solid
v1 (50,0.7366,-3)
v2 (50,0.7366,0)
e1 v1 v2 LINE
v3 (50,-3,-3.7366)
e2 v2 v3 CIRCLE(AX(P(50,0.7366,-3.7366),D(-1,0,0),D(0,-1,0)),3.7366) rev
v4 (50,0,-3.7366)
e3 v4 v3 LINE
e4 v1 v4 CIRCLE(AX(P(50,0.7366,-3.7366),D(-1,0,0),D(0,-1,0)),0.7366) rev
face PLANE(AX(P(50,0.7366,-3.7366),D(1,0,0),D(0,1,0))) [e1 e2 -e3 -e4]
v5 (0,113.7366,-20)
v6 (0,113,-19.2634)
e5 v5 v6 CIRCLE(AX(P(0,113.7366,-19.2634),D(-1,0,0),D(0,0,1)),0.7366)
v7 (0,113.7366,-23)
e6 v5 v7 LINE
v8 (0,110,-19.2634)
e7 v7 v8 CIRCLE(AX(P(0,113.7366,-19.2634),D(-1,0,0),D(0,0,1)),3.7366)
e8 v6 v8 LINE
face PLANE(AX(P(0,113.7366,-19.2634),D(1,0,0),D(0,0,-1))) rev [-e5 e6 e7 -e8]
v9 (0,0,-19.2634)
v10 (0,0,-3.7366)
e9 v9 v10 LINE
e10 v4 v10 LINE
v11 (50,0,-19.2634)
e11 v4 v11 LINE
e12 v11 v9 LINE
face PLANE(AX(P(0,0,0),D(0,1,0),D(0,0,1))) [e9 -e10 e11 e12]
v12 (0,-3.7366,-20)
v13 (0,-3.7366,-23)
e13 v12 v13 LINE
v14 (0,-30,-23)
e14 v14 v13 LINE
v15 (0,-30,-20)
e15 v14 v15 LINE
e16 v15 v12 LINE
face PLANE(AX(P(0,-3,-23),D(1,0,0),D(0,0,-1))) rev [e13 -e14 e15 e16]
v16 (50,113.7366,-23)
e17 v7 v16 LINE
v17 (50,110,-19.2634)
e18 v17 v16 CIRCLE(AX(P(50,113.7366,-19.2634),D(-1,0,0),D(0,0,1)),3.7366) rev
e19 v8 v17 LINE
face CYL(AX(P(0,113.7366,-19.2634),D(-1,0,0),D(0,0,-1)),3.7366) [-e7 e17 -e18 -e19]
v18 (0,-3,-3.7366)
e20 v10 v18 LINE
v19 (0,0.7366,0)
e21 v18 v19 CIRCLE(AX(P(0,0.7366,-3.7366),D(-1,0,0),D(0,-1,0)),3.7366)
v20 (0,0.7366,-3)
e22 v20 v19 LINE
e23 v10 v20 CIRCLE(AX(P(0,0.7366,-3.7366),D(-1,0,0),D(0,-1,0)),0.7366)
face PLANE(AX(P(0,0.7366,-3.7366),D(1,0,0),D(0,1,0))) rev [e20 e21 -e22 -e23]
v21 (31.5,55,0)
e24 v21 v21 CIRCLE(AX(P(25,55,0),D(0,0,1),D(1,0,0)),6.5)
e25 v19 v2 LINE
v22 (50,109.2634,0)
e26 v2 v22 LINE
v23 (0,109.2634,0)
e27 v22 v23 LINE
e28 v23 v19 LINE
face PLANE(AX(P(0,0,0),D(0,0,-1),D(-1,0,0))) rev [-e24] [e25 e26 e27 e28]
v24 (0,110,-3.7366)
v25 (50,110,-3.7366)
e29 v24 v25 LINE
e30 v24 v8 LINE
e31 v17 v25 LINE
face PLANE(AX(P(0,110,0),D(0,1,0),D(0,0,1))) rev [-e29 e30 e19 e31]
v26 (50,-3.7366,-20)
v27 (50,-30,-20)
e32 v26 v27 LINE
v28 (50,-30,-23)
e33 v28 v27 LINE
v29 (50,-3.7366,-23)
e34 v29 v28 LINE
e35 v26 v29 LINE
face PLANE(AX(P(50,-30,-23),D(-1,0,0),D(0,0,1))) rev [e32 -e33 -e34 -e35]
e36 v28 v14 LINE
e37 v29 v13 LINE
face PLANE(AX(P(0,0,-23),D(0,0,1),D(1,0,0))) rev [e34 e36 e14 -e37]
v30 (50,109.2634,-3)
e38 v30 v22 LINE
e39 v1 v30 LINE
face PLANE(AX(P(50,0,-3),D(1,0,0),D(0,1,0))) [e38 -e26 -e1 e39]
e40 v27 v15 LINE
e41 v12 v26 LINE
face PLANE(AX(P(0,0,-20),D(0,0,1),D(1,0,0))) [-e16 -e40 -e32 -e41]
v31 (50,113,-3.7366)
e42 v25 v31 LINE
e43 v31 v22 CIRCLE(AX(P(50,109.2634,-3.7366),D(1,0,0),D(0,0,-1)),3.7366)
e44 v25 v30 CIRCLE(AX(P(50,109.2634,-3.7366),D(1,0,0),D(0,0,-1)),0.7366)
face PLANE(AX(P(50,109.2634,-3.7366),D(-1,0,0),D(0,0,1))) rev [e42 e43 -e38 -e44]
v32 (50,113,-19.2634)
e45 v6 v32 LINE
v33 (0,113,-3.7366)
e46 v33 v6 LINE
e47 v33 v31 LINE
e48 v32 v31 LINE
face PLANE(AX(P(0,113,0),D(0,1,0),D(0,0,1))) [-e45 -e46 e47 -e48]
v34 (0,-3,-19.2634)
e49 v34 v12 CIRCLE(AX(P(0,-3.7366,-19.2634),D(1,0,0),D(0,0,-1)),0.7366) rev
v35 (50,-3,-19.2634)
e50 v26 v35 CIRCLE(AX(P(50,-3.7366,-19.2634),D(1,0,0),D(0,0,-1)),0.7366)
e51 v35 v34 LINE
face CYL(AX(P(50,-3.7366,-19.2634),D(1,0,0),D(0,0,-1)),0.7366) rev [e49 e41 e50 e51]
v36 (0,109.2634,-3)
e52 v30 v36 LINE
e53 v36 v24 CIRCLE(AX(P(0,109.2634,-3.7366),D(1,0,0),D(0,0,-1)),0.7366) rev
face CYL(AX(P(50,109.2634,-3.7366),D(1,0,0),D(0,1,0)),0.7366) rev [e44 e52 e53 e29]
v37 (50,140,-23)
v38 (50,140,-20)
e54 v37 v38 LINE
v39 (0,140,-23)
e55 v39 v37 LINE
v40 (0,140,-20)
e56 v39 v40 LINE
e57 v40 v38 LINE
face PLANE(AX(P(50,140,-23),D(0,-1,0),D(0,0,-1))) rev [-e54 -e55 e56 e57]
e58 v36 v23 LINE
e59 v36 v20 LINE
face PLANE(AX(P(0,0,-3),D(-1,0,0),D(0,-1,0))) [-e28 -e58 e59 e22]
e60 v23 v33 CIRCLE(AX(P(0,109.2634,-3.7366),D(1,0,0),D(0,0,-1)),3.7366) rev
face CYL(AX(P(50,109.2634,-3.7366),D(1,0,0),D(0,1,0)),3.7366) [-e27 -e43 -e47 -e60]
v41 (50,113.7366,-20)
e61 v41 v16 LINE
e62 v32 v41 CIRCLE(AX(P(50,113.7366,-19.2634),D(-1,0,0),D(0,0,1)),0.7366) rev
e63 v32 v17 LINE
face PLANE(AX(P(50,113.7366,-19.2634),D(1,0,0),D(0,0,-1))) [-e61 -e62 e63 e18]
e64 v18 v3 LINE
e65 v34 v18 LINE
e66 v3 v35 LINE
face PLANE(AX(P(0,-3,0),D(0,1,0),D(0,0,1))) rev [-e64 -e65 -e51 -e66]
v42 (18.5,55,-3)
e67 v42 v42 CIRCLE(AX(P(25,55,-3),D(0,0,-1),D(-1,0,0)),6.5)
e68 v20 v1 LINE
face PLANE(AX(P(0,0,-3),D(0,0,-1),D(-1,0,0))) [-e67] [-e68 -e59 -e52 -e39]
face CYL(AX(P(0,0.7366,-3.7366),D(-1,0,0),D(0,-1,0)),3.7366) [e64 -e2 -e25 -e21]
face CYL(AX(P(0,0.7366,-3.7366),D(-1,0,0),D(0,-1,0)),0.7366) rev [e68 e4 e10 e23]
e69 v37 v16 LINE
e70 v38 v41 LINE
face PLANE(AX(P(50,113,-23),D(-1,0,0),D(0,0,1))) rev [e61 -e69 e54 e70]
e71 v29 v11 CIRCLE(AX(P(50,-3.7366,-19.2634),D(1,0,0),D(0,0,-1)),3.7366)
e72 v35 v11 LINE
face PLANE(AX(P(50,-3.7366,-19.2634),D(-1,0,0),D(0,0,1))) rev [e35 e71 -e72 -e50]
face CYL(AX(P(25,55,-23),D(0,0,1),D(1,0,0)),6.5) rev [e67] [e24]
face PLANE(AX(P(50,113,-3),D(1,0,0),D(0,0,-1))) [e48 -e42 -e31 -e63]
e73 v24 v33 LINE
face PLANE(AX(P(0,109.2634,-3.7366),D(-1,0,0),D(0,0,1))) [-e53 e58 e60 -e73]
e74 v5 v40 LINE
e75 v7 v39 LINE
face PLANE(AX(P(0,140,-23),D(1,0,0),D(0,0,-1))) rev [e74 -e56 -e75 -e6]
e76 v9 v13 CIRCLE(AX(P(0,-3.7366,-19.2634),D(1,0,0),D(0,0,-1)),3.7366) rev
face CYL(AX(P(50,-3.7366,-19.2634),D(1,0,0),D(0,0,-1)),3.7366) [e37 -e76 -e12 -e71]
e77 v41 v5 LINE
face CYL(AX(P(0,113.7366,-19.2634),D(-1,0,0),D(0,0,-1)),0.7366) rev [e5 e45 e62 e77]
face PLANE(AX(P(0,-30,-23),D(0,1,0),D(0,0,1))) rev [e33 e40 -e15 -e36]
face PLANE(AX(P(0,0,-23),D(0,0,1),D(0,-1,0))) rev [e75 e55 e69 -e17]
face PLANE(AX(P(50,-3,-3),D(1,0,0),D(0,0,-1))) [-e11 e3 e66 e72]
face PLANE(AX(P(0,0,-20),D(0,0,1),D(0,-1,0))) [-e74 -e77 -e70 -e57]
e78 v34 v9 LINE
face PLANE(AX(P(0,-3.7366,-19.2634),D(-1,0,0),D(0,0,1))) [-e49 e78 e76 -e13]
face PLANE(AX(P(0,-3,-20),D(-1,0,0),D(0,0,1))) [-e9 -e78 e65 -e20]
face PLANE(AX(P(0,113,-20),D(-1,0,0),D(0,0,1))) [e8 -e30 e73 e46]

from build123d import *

# Parameters (mm, degrees)
SKETCH_1_W                         = 50
SKETCH_1_H                         = 110
SM_BASE_FLANGE_1_DEPTH             = 3
SM_EDGE_FLANGE_1_STRIP_W           = 13.4732
SM_EDGE_FLANGE_1_STRIP_H           = 3
SM_EDGE_FLANGE_1_STRIP_CUT_DEPTH   = 50
SM_EDGE_FLANGE_1_STRIP_2_W         = 13.4732
SM_EDGE_FLANGE_1_STRIP_2_H         = 3
SM_EDGE_FLANGE_1_STRIP_CUT_2_DEPTH = 50
SM_EDGE_FLANGE_1_DEPTH             = 50
SM_EDGE_FLANGE_1_BEND_DEPTH        = 50
SM_EDGE_FLANGE_2_STRIP_W           = 13.4732
SM_EDGE_FLANGE_2_STRIP_H           = 3
SM_EDGE_FLANGE_2_STRIP_CUT_DEPTH   = 50
SM_EDGE_FLANGE_2_STRIP_2_W         = 13.4732
SM_EDGE_FLANGE_2_STRIP_2_H         = 3
SM_EDGE_FLANGE_2_STRIP_CUT_2_DEPTH = 50
SM_EDGE_FLANGE_2_DEPTH             = 50
SM_EDGE_FLANGE_2_BEND_DEPTH        = 50
SKETCH_18_R                        = 6.5
CUT_EXTRUDE_1_DEPTH                = 151.429385427


# Sheet-metal steps are written as plain solids
with BuildPart() as part:
    # Sketch 1 → 基体-法兰1 (new body)
    with BuildSketch(Plane.XY):
        with Locations((25, 55)):
            Rectangle(SKETCH_1_W, SKETCH_1_H)
    extrude(amount=-SM_BASE_FLANGE_1_DEPTH)

    # 边线-法兰1 strip (across the edge) → 边线-法兰1 strip cut (cut)
    with BuildSketch(Plane(origin=(0, 110, -3), x_dir=(0, -1, 0), z_dir=(1, 0, 0))):
        with Locations((-6, -1.5)):
            Rectangle(SM_EDGE_FLANGE_1_STRIP_W, SM_EDGE_FLANGE_1_STRIP_H)
    extrude(amount=SM_EDGE_FLANGE_1_STRIP_CUT_DEPTH, mode=Mode.SUBTRACT)

    # 边线-法兰1 strip 2 (across the edge) → 边线-法兰1 strip cut 2 (cut)
    with BuildSketch(Plane(origin=(50, 0, -3), x_dir=(0, 1, 0), z_dir=(-1, 0, 0))):
        with Locations((-6, -1.5)):
            Rectangle(SM_EDGE_FLANGE_1_STRIP_2_W, SM_EDGE_FLANGE_1_STRIP_2_H)
    extrude(amount=SM_EDGE_FLANGE_1_STRIP_CUT_2_DEPTH, mode=Mode.SUBTRACT)

    # 边线-法兰1 section (across the edge) → 边线-法兰1 (add)
    with BuildSketch(Plane(origin=(0, 110, -3), x_dir=(0, -1, 0), z_dir=(1, 0, 0))):
        with BuildLine():
            Line((-3, 0.7366), (-3, 17))
            Line((-3, 17), (0, 17))
            Line((0, 17), (0, 0.7366))
            ThreePointArc((0, 0.7366), (0.215745145, 0.215745145), (0.7366, 0))
            Line((0.7366, 0), (0.7366, -3))
            ThreePointArc((0.7366, -3), (-1.905575199, -1.905575199), (-3, 0.7366))
        make_face()
    extrude(amount=SM_EDGE_FLANGE_1_DEPTH)

    # 边线-法兰1 section 2 (across the edge) → 边线-法兰1 bend (add)
    with BuildSketch(Plane(origin=(50, 0, -3), x_dir=(0, 1, 0), z_dir=(-1, 0, 0))):
        with BuildLine():
            Line((-3, 0.7366), (-3, 17))
            Line((-3, 17), (0, 17))
            Line((0, 17), (0, 0.7366))
            ThreePointArc((0, 0.7366), (0.215745145, 0.215745145), (0.7366, 0))
            Line((0.7366, 0), (0.7366, -3))
            ThreePointArc((0.7366, -3), (-1.905575199, -1.905575199), (-3, 0.7366))
        make_face()
    extrude(amount=SM_EDGE_FLANGE_1_BEND_DEPTH)

    # 边线-法兰2 strip (across the edge) → 边线-法兰2 strip cut (cut)
    with BuildSketch(Plane(origin=(0, -3, -20), x_dir=(0, 0, 1), z_dir=(1, 0, 0))):
        with Locations((-6, -1.5)):
            Rectangle(SM_EDGE_FLANGE_2_STRIP_W, SM_EDGE_FLANGE_2_STRIP_H)
    extrude(amount=SM_EDGE_FLANGE_2_STRIP_CUT_DEPTH, mode=Mode.SUBTRACT)

    # 边线-法兰2 strip 2 (across the edge) → 边线-法兰2 strip cut 2 (cut)
    with BuildSketch(Plane(origin=(50, 113, -20), x_dir=(0, 0, 1), z_dir=(-1, 0, 0))):
        with Locations((-6, -1.5)):
            Rectangle(SM_EDGE_FLANGE_2_STRIP_2_W, SM_EDGE_FLANGE_2_STRIP_2_H)
    extrude(amount=SM_EDGE_FLANGE_2_STRIP_CUT_2_DEPTH, mode=Mode.SUBTRACT)

    # 边线-法兰2 section (across the edge) → 边线-法兰2 (add)
    with BuildSketch(Plane(origin=(0, -3, -20), x_dir=(0, 0, 1), z_dir=(1, 0, 0))):
        with BuildLine():
            Line((-3, 0.7366), (-3, 27))
            Line((-3, 27), (0, 27))
            Line((0, 27), (0, 0.7366))
            ThreePointArc((0, 0.7366), (0.215745145, 0.215745145), (0.7366, 0))
            Line((0.7366, 0), (0.7366, -3))
            ThreePointArc((0.7366, -3), (-1.905575199, -1.905575199), (-3, 0.7366))
        make_face()
    extrude(amount=SM_EDGE_FLANGE_2_DEPTH)

    # 边线-法兰2 section 2 (across the edge) → 边线-法兰2 bend (add)
    with BuildSketch(Plane(origin=(50, 113, -20), x_dir=(0, 0, 1), z_dir=(-1, 0, 0))):
        with BuildLine():
            Line((-3, 0.7366), (-3, 27))
            Line((-3, 27), (0, 27))
            Line((0, 27), (0, 0.7366))
            ThreePointArc((0, 0.7366), (0.215745145, 0.215745145), (0.7366, 0))
            Line((0.7366, 0), (0.7366, -3))
            ThreePointArc((0.7366, -3), (-1.905575199, -1.905575199), (-3, 0.7366))
        make_face()
    extrude(amount=SM_EDGE_FLANGE_2_BEND_DEPTH)

    # 草图18 → 切除-拉伸1 (cut, through all)
    with BuildSketch(Plane.XY):
        with Locations((25, 55)):
            Circle(SKETCH_18_R)
    extrude(amount=-CUT_EXTRUDE_1_DEPTH, mode=Mode.SUBTRACT)


solid = part.part
